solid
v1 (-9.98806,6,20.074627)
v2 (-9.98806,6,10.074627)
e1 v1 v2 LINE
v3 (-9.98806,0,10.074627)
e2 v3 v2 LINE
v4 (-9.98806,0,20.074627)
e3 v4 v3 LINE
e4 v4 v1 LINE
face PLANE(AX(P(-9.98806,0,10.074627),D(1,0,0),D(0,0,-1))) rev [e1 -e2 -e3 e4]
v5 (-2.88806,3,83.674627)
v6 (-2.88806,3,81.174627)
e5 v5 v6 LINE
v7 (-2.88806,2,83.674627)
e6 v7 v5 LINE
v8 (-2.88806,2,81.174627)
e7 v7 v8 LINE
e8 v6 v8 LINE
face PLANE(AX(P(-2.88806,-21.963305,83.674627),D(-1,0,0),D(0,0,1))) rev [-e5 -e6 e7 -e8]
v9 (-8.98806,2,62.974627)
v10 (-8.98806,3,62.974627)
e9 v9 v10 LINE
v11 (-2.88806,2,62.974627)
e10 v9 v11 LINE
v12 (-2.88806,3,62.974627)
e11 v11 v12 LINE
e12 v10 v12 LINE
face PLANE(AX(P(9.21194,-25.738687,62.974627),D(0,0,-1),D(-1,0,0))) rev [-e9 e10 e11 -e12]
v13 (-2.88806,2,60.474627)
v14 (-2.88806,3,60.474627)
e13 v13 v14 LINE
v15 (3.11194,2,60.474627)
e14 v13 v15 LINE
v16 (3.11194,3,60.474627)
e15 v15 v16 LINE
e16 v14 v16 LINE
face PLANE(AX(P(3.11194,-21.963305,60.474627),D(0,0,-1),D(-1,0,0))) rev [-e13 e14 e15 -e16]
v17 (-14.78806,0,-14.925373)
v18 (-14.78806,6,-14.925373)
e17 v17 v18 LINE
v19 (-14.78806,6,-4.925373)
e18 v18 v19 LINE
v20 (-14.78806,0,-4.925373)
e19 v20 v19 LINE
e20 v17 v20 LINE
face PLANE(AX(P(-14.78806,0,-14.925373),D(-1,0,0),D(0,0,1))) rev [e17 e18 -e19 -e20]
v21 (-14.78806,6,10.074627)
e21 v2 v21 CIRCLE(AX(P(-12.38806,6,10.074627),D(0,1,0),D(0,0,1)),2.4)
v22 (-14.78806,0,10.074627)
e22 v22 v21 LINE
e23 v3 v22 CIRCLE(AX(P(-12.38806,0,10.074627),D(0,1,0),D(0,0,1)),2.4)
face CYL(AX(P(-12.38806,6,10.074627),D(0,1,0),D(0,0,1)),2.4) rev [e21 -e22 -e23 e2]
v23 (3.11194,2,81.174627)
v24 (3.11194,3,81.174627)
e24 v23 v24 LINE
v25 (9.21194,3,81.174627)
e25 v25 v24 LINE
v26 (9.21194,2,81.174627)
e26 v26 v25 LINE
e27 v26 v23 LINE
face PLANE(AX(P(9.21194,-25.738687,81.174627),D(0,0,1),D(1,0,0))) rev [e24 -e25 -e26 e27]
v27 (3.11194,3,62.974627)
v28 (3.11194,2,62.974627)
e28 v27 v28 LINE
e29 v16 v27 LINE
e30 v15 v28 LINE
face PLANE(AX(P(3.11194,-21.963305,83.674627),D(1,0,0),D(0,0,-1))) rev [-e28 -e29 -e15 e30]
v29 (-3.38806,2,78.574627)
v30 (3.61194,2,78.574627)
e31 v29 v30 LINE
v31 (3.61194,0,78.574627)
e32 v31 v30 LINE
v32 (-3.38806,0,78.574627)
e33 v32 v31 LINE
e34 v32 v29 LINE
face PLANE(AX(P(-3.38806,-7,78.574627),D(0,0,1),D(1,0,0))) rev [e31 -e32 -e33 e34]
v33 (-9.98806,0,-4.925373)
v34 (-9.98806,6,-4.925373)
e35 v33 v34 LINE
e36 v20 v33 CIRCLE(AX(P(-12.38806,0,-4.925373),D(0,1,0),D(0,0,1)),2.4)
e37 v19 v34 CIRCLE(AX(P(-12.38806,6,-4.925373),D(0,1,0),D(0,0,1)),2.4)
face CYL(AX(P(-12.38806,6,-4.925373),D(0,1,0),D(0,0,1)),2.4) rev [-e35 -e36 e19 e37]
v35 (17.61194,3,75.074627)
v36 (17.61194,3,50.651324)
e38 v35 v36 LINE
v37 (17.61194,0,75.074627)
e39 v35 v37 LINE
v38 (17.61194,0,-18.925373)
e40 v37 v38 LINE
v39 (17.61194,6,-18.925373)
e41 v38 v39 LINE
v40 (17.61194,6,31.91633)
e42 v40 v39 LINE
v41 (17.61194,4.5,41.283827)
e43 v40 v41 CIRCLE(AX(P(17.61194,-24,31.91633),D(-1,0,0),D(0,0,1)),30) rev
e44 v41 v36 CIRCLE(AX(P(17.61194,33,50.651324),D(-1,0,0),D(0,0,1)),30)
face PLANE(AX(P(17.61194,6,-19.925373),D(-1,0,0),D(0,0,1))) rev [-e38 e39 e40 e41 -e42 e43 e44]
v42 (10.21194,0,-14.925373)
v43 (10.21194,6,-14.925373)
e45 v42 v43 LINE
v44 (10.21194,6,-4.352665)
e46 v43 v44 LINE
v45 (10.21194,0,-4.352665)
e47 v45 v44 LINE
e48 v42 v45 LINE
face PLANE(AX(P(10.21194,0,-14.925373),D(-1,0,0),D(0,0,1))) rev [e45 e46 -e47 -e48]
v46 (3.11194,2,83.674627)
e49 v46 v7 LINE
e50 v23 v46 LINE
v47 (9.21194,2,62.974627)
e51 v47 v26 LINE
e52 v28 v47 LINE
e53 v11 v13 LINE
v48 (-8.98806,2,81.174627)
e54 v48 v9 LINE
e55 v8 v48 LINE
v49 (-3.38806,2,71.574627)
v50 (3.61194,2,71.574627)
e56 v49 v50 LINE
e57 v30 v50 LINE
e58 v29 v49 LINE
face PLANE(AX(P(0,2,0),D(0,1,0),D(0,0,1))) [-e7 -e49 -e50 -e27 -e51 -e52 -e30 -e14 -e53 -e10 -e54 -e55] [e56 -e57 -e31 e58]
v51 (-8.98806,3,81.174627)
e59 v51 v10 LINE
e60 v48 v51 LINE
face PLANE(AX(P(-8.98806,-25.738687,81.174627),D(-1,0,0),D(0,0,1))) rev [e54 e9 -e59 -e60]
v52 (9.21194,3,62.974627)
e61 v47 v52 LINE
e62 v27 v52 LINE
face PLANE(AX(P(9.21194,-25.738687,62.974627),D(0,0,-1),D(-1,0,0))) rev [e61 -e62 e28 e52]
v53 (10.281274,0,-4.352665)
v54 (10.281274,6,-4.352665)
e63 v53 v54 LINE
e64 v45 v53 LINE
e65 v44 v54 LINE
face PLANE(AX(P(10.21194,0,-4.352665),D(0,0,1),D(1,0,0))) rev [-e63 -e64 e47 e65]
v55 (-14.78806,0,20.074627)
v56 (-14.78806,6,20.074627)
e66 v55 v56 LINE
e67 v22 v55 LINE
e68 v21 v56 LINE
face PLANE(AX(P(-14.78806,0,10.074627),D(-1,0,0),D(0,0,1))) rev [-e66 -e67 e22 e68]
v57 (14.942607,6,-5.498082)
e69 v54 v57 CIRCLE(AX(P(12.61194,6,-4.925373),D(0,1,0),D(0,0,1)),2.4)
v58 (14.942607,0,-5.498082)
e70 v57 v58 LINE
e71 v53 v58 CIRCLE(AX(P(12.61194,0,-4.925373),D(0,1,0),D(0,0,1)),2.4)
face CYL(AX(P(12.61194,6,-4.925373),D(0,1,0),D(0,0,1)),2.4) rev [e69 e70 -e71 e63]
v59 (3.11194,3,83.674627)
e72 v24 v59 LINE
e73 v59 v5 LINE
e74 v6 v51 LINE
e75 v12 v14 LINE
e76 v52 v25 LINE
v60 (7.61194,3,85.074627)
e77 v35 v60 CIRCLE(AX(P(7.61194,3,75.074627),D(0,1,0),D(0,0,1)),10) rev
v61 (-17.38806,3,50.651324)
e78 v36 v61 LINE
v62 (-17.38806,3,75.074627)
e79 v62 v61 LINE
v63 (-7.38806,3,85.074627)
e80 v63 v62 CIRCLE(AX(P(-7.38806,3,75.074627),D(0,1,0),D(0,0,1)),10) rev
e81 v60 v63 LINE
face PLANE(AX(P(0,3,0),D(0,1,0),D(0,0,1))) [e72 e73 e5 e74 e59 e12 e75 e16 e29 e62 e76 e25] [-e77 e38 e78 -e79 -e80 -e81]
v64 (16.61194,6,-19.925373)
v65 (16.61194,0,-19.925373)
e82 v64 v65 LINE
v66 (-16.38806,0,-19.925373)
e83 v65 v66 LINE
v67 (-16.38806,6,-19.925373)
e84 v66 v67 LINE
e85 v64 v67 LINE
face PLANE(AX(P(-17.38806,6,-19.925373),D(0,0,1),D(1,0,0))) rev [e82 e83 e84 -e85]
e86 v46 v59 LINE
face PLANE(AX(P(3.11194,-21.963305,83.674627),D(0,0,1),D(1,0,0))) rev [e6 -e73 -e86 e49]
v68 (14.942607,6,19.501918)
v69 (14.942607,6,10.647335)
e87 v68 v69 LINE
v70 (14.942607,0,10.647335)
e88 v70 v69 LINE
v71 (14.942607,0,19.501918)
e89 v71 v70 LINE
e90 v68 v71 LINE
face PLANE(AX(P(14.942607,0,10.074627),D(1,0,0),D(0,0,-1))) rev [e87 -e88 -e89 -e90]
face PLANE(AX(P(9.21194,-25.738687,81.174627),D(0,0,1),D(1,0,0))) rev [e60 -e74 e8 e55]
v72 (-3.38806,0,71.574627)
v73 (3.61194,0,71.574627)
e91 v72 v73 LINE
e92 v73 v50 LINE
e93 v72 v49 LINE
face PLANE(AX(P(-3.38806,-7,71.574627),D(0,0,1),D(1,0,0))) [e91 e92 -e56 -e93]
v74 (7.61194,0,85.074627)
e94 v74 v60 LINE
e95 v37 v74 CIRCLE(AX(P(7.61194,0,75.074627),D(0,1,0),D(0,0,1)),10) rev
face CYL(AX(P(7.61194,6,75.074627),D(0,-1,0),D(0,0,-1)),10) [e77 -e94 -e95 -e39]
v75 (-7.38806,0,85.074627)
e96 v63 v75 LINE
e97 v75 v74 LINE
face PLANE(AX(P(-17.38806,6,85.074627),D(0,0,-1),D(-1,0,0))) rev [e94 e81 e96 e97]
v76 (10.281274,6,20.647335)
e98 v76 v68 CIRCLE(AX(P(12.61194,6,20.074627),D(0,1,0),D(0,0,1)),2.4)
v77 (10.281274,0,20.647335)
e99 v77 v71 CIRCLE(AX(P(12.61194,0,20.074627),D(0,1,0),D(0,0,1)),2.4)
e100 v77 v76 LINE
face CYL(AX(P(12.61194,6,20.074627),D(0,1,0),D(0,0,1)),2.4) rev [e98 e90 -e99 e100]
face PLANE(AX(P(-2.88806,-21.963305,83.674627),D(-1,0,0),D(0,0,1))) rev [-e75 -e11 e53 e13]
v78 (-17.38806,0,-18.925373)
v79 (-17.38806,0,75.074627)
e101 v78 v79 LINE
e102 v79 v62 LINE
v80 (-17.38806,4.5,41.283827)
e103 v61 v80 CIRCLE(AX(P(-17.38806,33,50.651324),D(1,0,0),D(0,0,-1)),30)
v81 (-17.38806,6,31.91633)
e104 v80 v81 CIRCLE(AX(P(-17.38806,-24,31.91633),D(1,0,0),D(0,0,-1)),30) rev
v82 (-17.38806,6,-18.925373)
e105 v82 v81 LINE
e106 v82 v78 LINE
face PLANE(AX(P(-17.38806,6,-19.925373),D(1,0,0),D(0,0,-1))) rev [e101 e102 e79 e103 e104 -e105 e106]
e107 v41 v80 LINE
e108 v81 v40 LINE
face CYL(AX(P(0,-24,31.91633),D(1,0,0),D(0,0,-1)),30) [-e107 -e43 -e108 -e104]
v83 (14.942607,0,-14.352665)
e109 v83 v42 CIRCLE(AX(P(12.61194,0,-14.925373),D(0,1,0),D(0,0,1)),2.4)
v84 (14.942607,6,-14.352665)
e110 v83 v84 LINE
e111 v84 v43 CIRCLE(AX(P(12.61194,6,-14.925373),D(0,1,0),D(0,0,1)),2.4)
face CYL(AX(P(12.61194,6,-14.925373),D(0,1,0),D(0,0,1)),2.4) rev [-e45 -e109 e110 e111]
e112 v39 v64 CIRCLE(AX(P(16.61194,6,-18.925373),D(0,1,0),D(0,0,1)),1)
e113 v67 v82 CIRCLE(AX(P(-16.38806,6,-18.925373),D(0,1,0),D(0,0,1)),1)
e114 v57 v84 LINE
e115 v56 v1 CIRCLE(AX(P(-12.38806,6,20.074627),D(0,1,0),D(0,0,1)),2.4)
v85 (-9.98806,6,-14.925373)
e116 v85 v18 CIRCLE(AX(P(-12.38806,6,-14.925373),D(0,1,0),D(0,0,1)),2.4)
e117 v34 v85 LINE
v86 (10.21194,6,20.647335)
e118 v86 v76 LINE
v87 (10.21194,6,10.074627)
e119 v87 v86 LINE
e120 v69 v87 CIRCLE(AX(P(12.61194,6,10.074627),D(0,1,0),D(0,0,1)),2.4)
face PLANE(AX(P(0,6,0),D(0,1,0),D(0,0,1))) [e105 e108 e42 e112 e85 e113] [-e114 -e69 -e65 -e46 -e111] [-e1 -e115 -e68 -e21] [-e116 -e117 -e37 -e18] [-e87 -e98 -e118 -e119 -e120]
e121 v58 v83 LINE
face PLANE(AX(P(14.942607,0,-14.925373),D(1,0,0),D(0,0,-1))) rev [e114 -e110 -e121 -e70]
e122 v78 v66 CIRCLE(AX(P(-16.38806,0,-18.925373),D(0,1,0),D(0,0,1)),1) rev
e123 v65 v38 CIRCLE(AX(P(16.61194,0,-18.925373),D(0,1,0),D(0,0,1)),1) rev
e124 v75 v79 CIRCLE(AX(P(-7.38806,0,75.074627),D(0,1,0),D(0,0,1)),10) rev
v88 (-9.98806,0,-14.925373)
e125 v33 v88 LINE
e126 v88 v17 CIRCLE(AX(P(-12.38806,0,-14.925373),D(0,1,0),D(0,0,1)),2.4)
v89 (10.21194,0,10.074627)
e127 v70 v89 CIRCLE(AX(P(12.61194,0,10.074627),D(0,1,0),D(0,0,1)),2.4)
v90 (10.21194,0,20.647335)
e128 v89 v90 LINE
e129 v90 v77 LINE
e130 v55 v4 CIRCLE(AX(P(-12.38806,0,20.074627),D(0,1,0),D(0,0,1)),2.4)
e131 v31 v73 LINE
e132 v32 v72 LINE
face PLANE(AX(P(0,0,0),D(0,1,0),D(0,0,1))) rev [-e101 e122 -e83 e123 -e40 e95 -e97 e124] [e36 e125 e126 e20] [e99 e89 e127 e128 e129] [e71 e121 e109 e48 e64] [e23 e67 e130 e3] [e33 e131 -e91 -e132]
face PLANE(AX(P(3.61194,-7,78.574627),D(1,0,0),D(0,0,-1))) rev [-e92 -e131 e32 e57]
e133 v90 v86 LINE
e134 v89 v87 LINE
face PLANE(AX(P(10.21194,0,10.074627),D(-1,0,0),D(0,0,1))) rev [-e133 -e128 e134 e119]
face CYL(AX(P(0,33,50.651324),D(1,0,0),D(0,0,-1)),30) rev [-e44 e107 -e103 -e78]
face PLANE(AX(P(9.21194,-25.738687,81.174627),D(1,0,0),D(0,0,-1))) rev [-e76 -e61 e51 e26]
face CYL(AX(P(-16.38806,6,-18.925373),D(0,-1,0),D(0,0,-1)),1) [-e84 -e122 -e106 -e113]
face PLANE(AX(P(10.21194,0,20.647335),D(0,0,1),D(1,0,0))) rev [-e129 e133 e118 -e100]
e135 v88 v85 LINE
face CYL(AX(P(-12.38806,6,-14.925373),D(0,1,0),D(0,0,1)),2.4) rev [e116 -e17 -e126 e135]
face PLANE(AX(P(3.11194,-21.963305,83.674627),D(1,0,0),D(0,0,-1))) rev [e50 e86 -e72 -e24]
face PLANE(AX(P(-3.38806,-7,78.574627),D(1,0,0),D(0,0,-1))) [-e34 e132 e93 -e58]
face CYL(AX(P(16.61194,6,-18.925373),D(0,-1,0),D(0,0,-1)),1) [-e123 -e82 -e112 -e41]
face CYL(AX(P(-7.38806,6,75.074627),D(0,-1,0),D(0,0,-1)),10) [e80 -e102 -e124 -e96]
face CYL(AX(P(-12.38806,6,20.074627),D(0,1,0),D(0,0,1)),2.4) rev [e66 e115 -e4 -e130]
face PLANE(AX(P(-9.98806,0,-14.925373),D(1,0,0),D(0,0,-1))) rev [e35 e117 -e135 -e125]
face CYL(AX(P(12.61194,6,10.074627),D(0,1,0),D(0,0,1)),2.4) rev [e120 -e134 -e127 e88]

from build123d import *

# Parameters (mm, degrees)
SKETCH1_W            = 35
SKETCH1_H            = 105
BOSS_EXTRUDE1_DEPTH  = 6
M4_CLEARANCE_HOLE1_D = 4.8
LPATTERN2_COUNT      = 2
LPATTERN2_PITCH      = 10
SKETCH5_W            = 4.8
SKETCH5_H            = 10
SKETCH5_W_2          = 4.730666207
SKETCH5_H_2          = 10.572708501
CUT_EXTRUDE1_DEPTH   = 88.085432636
SKETCH6_W            = 18.2
SKETCH6_H            = 18.2
CUT_EXTRUDE2_DEPTH   = 4
SKETCH7_W            = 7
SKETCH7_H            = 7
CUT_EXTRUDE3_DEPTH   = 87.970527062
SKETCH8_W            = 6
SKETCH8_H            = 23.2
CUT_EXTRUDE4_DEPTH   = 4
FILLET1_R            = 10
CUT_EXTRUDE5_START   = -6
SKETCH9_W            = 37.049954943
SKETCH9_H            = 47.5
CUT_EXTRUDE5_DEPTH   = 3
FILLET2_R            = 30
FILLET3_R            = 30
FILLET4_R            = 1
SKETCH14_W           = 7
SKETCH14_H           = 2
BOSS_EXTRUDE2_DEPTH  = 7
SKETCH16_W           = 7
SKETCH16_H           = 7
CUT_EXTRUDE6_DEPTH   = 10


with BuildPart() as part:
    # Sketch1 → Boss-Extrude1 (new body)
    with BuildSketch(Plane(origin=(0, 0, 0), x_dir=(1, 0, 0), z_dir=(0, 1, 0))):
        with Locations((0.111940299, -32.574626866)):
            Rectangle(SKETCH1_W, SKETCH1_H)
    extrude(amount=BOSS_EXTRUDE1_DEPTH)

    # M4 Clearance Hole1 (through all)
    with Locations(Plane(origin=(0, 6, 0), x_dir=(1, 0, 0), z_dir=(0, 1, 0))):
        with Locations((-12.388059701, 14.925373134), (12.611940299, 14.925373134), (12.611940299, -10.074626866), (-12.388059701, -10.074626866)):
            m4_clearance_hole1 = Hole(M4_CLEARANCE_HOLE1_D / 2)

    # LPattern2: M4 Clearance Hole1 ×2
    with Locations(*[(0, 0, i * LPATTERN2_PITCH) for i in range(1, LPATTERN2_COUNT)]):
        add(m4_clearance_hole1, mode=Mode.SUBTRACT)

    # Sketch5 → Cut-Extrude1 (cut, through all)
    with BuildSketch(Plane(origin=(0, 6, 0), x_dir=(1, 0, 0), z_dir=(0, 1, 0))):
        with Locations((-12.388059701, 9.925373134)):
            Rectangle(SKETCH5_W, SKETCH5_H)
        with Locations((-12.388059701, -15.074626866)):
            Rectangle(SKETCH5_W, SKETCH5_H)
        with Locations((12.577273403, 9.639018884)):
            Rectangle(SKETCH5_W_2, SKETCH5_H_2)
        with Locations((12.577273403, -15.360981116)):
            Rectangle(SKETCH5_W_2, SKETCH5_H_2)
    extrude(amount=-CUT_EXTRUDE1_DEPTH, mode=Mode.SUBTRACT)

    # Sketch6 → Cut-Extrude2 (cut)
    with BuildSketch(Plane(origin=(0, 6, 0), x_dir=(1, 0, 0), z_dir=(0, 1, 0))):
        with Locations((0.111940299, -72.074626866)):
            Rectangle(SKETCH6_W, SKETCH6_H)
    extrude(amount=-CUT_EXTRUDE2_DEPTH, mode=Mode.SUBTRACT)

    # Sketch7 → Cut-Extrude3 (cut, through all)
    with BuildSketch(Plane(origin=(0, 2, 0), x_dir=(1, 0, 0), z_dir=(0, 1, 0))):
        with Locations((0.111940299, -72.074626866)):
            Rectangle(SKETCH7_W, SKETCH7_H)
    extrude(amount=-CUT_EXTRUDE3_DEPTH, mode=Mode.SUBTRACT)

    # Sketch8 → Cut-Extrude4 (cut)
    with BuildSketch(Plane(origin=(0, 6, 0), x_dir=(1, 0, 0), z_dir=(0, 1, 0))):
        with Locations((0.111940299, -72.074626866)):
            Rectangle(SKETCH8_W, SKETCH8_H)
    extrude(amount=-CUT_EXTRUDE4_DEPTH, mode=Mode.SUBTRACT)

    # Fillet1
    fillet1_edges = [part.edges().sort_by_distance(p)[0] for p in [
        (17.611940299, 3, 85.074626866),
        (-17.388059701, 3, 85.074626866),
    ]]
    fillet(fillet1_edges, radius=FILLET1_R)

    # Sketch9 → Cut-Extrude5 (cut)
    with BuildSketch(Plane.XZ.offset(CUT_EXTRUDE5_START)):
        with Locations((1.136917771, 61.324626866)):
            Rectangle(SKETCH9_W, SKETCH9_H)
    extrude(amount=CUT_EXTRUDE5_DEPTH, mode=Mode.SUBTRACT)

    # Fillet2
    # the kernel refuses this fillet: 30 mm, written as the material it adds along each edge
    with BuildSketch(Plane(origin=(-17.388059701, 3, 37.574626866), x_dir=(0, 1, 0), z_dir=(1, 0, 0))) as fillet2_piece_1:
        with BuildLine():
            CenterArc((30, 13.076696831), FILLET2_R, 180, 25.841932763)
            Line((0, 13.076696831), (-0.6, 13.076696831))
            Line((-0.6, 13.076696831), (-0.6, 0))
            Line((-0.6, 0), (0, -0.6))
            ThreePointArc((0, -0.6), (1.5, -0.6), (2.46, -0.261533937))
            Line((2.46, -0.261533937), (3, 0))
        make_face()
    extrude(amount=35)

    # Fillet3
    fillet3_edges = [part.edges().sort_by_distance(p)[0] for p in [
        (0.111940299, 6, 37.574626866),
    ]]
    fillet(fillet3_edges, radius=FILLET3_R)

    # Fillet4
    fillet4_edges = [part.edges().sort_by_distance(p)[0] for p in [
        (-17.388059701, 3, -19.925373134),
        (17.611940299, 3, -19.925373134),
    ]]
    fillet(fillet4_edges, radius=FILLET4_R)

    # Sketch14 → Boss-Extrude2 (add)
    with BuildSketch(Plane(origin=(-3.388059701, 0, 0), x_dir=(0, 0, -1), z_dir=(1, 0, 0))):
        with Locations((-72.074626866, 1)):
            Rectangle(SKETCH14_W, SKETCH14_H)
    extrude(amount=BOSS_EXTRUDE2_DEPTH)

    # Sketch16 → Cut-Extrude6 (cut)
    with BuildSketch(Plane(origin=(0, 3, 0), x_dir=(1, 0, 0), z_dir=(0, 1, 0))):
        with Locations((0.111940299, -75.074626866)):
            Rectangle(SKETCH16_W, SKETCH16_H)
    extrude(amount=-CUT_EXTRUDE6_DEPTH, mode=Mode.SUBTRACT)


solid = part.part
